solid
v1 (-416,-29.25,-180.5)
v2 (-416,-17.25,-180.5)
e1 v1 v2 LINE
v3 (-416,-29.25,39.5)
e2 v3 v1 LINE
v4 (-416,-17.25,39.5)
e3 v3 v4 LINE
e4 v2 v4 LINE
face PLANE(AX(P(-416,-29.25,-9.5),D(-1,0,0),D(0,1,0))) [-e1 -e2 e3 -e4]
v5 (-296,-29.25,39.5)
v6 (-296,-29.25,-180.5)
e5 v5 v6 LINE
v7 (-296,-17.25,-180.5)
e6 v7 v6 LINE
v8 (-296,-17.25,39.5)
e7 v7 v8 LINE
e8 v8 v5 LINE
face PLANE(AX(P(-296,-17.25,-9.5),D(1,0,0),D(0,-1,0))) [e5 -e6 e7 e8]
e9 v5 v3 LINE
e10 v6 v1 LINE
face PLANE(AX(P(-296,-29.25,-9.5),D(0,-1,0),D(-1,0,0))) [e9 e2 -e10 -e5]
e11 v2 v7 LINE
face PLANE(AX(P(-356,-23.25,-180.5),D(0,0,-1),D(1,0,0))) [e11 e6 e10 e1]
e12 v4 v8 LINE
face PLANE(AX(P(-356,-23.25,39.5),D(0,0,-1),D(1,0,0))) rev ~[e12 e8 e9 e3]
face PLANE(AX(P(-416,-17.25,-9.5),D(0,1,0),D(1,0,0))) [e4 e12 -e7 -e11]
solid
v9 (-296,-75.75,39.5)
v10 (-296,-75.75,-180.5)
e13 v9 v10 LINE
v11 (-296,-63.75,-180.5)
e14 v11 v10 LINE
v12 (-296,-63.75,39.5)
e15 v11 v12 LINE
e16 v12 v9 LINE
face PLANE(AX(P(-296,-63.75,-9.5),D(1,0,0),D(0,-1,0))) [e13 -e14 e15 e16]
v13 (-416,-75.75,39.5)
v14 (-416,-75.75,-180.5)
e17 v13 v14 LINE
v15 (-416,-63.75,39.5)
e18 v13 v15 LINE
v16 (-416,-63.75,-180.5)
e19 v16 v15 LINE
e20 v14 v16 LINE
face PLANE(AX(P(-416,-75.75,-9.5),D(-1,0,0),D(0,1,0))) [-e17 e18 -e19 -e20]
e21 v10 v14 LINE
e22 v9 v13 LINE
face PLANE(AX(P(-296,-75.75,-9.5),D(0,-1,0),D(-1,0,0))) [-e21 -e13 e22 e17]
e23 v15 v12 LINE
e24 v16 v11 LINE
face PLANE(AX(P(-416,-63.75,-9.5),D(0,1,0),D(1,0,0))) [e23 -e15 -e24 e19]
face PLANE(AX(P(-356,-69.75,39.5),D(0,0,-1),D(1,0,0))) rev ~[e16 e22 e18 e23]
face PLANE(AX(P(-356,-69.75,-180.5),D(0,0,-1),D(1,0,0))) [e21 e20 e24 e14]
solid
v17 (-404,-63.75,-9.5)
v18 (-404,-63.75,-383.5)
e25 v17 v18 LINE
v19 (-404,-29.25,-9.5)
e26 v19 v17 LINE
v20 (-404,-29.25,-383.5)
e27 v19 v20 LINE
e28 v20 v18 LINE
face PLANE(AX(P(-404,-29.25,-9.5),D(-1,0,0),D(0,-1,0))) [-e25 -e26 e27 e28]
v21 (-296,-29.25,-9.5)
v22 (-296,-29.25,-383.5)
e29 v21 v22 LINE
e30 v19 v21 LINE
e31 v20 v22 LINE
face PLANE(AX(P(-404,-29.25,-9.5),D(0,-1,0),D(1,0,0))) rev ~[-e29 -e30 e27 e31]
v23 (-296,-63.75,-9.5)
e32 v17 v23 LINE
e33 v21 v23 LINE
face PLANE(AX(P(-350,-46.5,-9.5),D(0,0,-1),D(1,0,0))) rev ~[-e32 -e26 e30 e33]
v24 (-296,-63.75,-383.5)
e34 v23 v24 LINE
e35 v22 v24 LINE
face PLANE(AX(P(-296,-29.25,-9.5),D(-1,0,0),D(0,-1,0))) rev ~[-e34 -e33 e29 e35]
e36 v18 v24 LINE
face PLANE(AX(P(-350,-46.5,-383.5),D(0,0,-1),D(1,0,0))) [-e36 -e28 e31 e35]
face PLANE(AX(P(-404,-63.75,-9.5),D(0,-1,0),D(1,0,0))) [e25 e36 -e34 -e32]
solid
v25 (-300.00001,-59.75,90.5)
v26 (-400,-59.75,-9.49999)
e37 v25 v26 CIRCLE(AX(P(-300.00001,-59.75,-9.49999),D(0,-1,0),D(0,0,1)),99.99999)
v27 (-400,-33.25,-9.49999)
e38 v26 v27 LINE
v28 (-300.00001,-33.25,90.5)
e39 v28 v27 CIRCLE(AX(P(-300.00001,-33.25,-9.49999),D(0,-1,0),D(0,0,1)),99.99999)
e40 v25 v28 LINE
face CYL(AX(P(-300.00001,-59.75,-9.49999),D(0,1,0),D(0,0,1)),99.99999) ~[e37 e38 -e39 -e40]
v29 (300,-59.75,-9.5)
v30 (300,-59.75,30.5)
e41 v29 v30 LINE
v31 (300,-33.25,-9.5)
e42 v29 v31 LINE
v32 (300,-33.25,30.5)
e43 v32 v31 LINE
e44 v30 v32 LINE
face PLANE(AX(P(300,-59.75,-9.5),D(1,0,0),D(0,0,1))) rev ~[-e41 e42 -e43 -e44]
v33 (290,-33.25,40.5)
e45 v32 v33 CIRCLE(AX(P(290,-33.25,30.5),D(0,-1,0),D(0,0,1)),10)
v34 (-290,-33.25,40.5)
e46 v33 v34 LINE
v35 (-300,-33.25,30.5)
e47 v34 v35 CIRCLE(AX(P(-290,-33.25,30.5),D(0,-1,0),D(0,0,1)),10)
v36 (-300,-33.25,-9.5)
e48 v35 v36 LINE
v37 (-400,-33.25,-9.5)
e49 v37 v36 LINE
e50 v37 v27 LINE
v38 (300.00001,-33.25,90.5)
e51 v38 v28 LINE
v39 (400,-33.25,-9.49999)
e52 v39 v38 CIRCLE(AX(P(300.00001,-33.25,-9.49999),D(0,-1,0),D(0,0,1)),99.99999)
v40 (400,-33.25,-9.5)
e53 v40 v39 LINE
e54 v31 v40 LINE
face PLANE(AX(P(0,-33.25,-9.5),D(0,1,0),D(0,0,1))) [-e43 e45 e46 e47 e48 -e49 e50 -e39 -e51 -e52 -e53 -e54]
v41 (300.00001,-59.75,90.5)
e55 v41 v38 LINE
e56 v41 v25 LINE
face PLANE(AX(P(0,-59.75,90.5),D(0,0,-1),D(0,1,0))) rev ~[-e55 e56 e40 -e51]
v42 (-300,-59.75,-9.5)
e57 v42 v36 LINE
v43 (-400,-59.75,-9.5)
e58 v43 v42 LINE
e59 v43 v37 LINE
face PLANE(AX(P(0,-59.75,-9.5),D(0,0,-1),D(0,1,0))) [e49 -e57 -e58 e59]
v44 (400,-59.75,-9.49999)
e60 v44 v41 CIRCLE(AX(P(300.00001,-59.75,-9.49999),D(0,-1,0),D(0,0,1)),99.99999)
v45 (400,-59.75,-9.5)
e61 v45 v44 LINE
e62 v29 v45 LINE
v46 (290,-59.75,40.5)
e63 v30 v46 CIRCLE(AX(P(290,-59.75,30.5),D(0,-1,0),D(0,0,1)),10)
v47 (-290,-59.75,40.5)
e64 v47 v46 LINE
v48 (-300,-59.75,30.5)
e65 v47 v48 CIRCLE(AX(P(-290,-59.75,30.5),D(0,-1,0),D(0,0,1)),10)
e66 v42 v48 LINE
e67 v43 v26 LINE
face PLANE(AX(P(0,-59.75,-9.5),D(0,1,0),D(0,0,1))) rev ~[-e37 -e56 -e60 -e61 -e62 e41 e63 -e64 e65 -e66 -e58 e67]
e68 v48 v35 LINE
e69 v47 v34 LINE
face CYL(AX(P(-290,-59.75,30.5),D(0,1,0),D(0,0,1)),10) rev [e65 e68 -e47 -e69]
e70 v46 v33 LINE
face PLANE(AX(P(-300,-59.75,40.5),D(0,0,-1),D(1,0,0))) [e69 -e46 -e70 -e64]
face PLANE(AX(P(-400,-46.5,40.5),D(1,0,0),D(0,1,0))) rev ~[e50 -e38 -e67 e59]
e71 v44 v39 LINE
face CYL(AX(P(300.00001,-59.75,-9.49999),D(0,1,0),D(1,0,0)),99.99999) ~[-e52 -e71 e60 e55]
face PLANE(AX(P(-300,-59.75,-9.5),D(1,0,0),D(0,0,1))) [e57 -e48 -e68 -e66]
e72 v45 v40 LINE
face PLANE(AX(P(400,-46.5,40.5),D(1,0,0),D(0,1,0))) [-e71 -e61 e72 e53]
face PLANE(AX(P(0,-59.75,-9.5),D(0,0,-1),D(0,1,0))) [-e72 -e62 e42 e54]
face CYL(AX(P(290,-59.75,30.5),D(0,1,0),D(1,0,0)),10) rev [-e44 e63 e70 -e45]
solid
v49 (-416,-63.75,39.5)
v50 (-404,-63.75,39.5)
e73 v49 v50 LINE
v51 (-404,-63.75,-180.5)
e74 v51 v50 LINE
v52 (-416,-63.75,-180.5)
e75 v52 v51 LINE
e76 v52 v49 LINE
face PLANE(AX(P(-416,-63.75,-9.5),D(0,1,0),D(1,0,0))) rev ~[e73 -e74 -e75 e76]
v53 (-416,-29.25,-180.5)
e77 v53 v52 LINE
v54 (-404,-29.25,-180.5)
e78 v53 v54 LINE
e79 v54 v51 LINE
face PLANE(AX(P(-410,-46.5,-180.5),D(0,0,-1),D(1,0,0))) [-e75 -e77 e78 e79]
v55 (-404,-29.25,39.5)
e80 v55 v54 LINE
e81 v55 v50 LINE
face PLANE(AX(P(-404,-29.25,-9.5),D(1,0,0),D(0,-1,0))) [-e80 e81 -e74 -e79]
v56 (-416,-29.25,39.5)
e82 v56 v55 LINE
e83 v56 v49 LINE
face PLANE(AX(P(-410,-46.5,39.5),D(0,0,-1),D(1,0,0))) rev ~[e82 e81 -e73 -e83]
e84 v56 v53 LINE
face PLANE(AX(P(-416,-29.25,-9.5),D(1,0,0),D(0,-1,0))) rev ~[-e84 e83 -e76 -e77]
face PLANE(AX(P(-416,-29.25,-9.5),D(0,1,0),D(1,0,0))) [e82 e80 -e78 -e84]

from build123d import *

# Parameters (mm, degrees)
F0_W          = 26.5
F0_H          = 100
F1_DEPTH      = 400
F1_DEPTH_BACK = 400
F2_W          = 600
F2_H          = 50
F3_DEPTH      = 26.501
F4_R          = 99.99999
F5_R          = 10
F6_W          = 108
F6_H          = 34.5
F6_W_2        = 100
F6_H_2        = 26.5
F7_DEPTH      = 374
F8_DEPTH      = 171
F8_DEPTH_BACK = 49
F6_W_3        = 12
F9_DEPTH      = 171
F9_DEPTH_BACK = 49


# Not quite as in the source:
# - a fillet or chamfer is up to 0.001 mm smaller than in the source, because OpenCascade refuses the exact size


with BuildPart() as f1:
    # F0 (on Right) → F1 (new body, two sides)
    with BuildSketch(Plane.YZ) as f1_sk:
        with Locations((-46.5, 40.5)):
            Rectangle(F0_W, F0_H)
    extrude(amount=F1_DEPTH)
    extrude(f1_sk.sketch, amount=-F1_DEPTH_BACK)

    # F2 (on face) → F3 (cut, through all)
    with BuildSketch(Plane.XZ.offset(59.75)):
        with Locations((0, 15.5)):
            Rectangle(F2_W, F2_H)
    extrude(amount=-F3_DEPTH, mode=Mode.SUBTRACT)

    # F4 (radius 100 in the source; OpenCascade refuses exactly that, so slightly less here)
    f4_edges = [f1.edges().sort_by_distance(p)[0] for p in [
        (-400, -46.5, 90.5),
        (400, -46.5, 90.5),
    ]]
    fillet(f4_edges, radius=F4_R)

    # F5
    f5_edges = [f1.edges().sort_by_distance(p)[0] for p in [
        (-300, -46.5, 40.5),
        (300, -46.5, 40.5),
    ]]
    fillet(f5_edges, radius=F5_R)


with BuildPart() as f7:
    # F6 (on face) → F7 (new body)
    with BuildSketch(Plane(origin=(0, 0, -9.5), x_dir=(1, 0, 0), z_dir=(0, 0, -1))):
        with Locations((-350, 46.5)):
            Rectangle(F6_W, F6_H)
        with Locations((-350, 46.5)):
            Rectangle(F6_W_2, F6_H_2, mode=Mode.SUBTRACT)
        with Locations((-350, 46.5)):
            Rectangle(F6_W_2, F6_H_2)
    extrude(amount=F7_DEPTH)


with BuildPart() as f8:
    # F6 (on face) → F8 (new body, two sides)
    with BuildSketch(Plane(origin=(0, 0, -9.5), x_dir=(1, 0, 0), z_dir=(0, 0, -1))) as f8_sk:
        Polygon((-404, 63.75), (-296, 63.75), (-296, 75.75), (-416, 75.75), (-416, 63.75), align=None)
    extrude(amount=F8_DEPTH)
    extrude(f8_sk.sketch, amount=-F8_DEPTH_BACK)


with BuildPart() as f8b:
    # F6 (on face) → F8, piece 2 (new body, two sides)
    with BuildSketch(Plane(origin=(0, 0, -9.5), x_dir=(1, 0, 0), z_dir=(0, 0, -1))) as f8_2_sk:
        Polygon((-296, 17.25), (-296, 29.25), (-404, 29.25), (-416, 29.25), (-416, 17.25), align=None)
    extrude(amount=F8_DEPTH)
    extrude(f8_2_sk.sketch, amount=-F8_DEPTH_BACK)


with BuildPart() as f9:
    # F6 (on face) → F9 (new body, two sides)
    with BuildSketch(Plane(origin=(0, 0, -9.5), x_dir=(1, 0, 0), z_dir=(0, 0, -1))) as f9_sk:
        with Locations((-410, 46.5)):
            Rectangle(F6_W_3, F6_H)
    extrude(amount=F9_DEPTH)
    extrude(f9_sk.sketch, amount=-F9_DEPTH_BACK)


solid = Compound([f1.part, f7.part, f8.part, f8b.part, f9.part])
